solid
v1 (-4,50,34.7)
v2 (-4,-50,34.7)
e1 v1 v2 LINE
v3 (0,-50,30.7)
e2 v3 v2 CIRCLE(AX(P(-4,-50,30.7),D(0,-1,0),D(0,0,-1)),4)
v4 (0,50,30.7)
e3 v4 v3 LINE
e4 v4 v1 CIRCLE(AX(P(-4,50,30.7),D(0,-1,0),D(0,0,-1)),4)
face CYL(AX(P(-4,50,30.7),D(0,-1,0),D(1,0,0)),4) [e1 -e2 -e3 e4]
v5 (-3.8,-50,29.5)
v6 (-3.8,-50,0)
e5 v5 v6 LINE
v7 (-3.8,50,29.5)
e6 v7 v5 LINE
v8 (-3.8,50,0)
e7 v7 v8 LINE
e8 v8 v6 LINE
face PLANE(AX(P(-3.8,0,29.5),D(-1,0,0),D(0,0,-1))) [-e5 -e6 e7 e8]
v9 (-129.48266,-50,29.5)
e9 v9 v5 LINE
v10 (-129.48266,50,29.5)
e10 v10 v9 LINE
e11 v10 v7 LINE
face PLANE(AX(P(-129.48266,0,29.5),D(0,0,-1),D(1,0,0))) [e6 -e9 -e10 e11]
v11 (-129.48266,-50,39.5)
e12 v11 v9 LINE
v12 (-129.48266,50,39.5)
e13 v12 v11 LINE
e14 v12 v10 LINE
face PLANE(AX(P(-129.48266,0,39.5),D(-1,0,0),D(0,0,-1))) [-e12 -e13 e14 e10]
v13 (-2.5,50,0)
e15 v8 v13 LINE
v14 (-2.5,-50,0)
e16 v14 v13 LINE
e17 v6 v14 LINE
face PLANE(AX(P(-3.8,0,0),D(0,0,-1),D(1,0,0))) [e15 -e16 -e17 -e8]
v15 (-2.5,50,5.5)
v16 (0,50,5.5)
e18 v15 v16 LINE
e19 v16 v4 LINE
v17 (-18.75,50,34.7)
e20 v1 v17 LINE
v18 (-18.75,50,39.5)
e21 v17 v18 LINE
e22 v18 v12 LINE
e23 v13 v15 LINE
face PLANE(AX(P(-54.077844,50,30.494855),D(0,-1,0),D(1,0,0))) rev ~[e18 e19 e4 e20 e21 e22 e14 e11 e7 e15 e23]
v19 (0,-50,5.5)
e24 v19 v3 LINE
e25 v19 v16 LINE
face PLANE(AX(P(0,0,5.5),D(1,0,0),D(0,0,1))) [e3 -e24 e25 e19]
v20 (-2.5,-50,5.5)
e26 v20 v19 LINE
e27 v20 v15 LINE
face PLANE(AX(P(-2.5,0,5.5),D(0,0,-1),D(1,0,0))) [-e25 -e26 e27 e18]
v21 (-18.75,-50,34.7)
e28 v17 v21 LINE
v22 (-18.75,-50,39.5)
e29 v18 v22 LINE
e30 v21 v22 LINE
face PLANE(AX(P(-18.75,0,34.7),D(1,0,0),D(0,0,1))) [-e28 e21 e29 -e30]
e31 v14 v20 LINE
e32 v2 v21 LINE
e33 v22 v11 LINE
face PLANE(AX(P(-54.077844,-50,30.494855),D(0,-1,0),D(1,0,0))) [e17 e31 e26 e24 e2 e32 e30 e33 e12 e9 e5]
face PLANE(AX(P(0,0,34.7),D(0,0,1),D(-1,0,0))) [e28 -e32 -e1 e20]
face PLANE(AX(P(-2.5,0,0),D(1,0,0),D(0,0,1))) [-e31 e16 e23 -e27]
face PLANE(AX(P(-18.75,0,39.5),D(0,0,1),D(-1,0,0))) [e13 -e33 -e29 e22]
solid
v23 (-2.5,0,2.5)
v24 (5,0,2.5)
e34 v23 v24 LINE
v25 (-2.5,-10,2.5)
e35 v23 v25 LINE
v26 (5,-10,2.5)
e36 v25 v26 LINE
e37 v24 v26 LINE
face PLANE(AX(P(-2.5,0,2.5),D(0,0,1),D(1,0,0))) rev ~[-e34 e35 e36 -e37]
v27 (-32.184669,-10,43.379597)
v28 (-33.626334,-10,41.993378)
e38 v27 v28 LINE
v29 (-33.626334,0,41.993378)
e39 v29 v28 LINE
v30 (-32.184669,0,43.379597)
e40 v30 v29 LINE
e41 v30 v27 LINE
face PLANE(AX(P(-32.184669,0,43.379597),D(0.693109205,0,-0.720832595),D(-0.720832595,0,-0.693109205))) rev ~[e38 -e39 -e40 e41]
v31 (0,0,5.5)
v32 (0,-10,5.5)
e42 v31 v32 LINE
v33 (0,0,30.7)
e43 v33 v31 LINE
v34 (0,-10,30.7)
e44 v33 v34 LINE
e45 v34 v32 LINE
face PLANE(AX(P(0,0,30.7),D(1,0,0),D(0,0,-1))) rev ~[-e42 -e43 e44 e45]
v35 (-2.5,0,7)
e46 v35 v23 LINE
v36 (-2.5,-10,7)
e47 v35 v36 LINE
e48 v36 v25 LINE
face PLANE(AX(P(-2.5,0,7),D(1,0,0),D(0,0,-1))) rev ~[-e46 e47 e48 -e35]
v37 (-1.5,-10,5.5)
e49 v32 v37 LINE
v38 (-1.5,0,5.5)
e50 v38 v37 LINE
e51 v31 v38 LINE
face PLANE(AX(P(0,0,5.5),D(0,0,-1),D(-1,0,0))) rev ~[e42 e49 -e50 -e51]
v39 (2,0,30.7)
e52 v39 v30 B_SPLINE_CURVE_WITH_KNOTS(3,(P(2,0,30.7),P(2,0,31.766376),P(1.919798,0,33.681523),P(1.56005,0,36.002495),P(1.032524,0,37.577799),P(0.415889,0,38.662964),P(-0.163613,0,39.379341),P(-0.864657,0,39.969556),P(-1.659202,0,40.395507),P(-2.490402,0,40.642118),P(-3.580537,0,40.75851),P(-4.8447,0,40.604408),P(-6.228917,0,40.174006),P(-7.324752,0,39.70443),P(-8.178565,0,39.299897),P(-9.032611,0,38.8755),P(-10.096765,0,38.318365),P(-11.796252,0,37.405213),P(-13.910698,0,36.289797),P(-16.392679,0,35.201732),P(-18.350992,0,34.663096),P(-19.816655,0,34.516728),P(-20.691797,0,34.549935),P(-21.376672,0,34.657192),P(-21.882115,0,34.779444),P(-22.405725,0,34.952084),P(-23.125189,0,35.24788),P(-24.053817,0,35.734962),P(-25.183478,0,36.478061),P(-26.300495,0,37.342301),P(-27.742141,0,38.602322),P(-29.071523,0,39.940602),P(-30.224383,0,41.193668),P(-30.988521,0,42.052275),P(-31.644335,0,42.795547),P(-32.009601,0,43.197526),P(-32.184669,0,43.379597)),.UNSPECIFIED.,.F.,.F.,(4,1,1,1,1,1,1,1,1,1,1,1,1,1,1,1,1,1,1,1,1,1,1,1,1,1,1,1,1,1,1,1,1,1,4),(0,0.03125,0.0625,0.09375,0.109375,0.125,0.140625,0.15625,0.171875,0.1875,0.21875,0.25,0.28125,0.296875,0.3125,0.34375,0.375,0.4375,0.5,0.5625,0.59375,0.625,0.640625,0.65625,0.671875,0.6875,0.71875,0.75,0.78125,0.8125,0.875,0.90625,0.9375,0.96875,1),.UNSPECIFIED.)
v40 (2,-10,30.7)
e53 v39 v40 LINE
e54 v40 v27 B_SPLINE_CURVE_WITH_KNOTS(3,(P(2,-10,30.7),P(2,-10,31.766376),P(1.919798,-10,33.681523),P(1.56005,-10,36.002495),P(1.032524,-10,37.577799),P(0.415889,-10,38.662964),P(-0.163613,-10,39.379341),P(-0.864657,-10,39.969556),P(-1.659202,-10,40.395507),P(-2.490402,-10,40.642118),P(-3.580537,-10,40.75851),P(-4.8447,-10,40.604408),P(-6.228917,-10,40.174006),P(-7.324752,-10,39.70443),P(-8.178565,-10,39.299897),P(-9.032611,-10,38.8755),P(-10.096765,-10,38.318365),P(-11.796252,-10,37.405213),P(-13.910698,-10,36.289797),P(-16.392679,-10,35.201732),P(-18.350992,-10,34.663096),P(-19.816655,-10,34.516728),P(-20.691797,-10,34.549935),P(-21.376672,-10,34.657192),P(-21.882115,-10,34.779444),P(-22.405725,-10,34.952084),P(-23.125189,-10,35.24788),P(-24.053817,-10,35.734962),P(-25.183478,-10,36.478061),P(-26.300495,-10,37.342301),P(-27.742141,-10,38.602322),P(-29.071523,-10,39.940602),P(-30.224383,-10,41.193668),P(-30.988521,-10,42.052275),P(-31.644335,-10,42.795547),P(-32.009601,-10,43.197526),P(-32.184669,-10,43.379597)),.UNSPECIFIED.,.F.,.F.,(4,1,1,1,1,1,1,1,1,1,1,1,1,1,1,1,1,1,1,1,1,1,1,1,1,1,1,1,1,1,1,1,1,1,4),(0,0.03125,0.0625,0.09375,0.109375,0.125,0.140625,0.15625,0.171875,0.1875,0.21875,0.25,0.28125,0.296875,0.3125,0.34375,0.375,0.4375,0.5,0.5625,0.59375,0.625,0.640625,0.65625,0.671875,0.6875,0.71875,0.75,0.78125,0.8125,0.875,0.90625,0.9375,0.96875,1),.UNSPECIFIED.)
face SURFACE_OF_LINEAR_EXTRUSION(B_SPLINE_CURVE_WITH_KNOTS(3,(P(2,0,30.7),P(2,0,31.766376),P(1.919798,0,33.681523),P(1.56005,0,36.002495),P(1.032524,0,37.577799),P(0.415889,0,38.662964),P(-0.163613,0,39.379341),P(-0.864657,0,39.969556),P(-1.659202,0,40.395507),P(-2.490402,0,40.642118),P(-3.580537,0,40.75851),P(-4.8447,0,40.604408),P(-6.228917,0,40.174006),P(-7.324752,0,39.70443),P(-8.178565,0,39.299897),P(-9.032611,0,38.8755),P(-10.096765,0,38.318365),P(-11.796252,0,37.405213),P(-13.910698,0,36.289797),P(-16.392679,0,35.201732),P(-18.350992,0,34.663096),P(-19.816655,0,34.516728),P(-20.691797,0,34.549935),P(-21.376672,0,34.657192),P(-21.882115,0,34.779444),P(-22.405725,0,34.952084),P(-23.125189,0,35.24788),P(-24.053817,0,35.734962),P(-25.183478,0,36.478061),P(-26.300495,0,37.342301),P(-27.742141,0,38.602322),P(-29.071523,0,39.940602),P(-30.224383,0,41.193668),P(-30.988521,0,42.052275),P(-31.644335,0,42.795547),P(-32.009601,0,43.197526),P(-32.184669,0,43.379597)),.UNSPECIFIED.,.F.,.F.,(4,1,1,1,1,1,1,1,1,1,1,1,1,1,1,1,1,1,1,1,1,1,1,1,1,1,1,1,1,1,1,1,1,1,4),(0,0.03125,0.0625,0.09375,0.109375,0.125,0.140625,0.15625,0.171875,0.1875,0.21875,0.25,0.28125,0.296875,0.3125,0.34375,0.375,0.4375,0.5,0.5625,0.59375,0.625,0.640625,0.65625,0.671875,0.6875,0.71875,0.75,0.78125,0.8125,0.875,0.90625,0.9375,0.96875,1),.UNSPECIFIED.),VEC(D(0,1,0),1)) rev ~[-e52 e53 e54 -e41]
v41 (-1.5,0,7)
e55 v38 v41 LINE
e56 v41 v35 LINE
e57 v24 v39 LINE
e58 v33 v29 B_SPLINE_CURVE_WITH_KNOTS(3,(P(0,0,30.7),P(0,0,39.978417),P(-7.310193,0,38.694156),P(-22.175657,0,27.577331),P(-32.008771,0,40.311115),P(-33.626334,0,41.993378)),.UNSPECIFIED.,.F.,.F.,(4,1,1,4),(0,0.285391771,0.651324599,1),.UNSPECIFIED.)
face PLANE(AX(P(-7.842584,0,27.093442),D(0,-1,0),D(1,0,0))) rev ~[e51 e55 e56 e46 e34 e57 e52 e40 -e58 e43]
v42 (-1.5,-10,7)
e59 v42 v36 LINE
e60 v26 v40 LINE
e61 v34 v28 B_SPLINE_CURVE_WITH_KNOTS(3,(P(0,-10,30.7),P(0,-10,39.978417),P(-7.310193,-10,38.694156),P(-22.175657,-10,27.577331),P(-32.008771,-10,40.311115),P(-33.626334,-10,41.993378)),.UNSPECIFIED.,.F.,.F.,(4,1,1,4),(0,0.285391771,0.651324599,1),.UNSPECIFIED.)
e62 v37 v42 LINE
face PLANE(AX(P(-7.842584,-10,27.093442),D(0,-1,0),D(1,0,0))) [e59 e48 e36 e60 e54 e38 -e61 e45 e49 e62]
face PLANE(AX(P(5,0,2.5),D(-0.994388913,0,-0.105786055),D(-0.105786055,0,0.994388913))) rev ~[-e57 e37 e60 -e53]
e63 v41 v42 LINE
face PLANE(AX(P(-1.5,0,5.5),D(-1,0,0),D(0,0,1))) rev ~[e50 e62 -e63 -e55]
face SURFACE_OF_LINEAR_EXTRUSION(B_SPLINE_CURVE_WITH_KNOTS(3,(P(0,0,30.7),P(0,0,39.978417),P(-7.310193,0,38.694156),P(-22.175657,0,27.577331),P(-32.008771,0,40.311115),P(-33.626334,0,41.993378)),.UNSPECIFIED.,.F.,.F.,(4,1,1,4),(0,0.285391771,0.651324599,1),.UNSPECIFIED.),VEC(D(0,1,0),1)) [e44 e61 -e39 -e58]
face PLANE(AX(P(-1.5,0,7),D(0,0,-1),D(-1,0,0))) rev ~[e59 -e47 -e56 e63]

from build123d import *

# Parameters (mm, degrees)
F1_DEPTH = 50
F2_R     = 4
F4_DEPTH = 10


# Not quite as in the source:
# - the dataset's text gives a spline's control points without its knots; the knots are read off the source's solid


with BuildPart() as f1:
    # F0 (on Front) → F1 (new body, symmetric)
    with BuildSketch(Plane.XZ):
        Polygon((0, 5.5), (0, 34.7), (-18.75, 34.7), (-18.75, 39.5), (-129.4826599298, 39.5), (-129.4826599298, 29.5), (-3.8, 29.5), (-3.8, 0), (-2.5, 0), (-2.5, 5.5), align=None)
    extrude(amount=F1_DEPTH, both=True)

    # F2
    f2_edges = [f1.edges().sort_by_distance(p)[0] for p in [
        (0, 0, 34.7),
    ]]
    fillet(f2_edges, radius=F2_R)


with BuildPart() as f4:
    # F3 (on Front) → F4 (new body)
    with BuildSketch(Plane.XZ):
        with BuildLine():
            Line((0, 30.7), (0, 5.5))
            Line((0, 5.5), (-1.5, 5.5))
            Line((-1.5, 5.5), (-1.5, 7))
            Line((-1.5, 7), (-2.5, 7))
            Line((-2.5, 7), (-2.5, 5.5))
            Line((-2.5, 5.5), (-2.5, 2.5))
            Line((-2.5, 2.5), (5, 2.5))
            Line((5, 2.5), (2, 30.7))
            add(Edge.make_bspline(
                [(2, 30.7), (2, 31.7663755094), (1.9197978856, 33.6815229202), (1.560050438, 36.0024950572), (1.0325239491, 37.5777989644), (0.4158888599, 38.6629640394), (-0.1636126536, 39.3793411079), (-0.8646567386, 39.9695560734), (-1.6592021315, 40.3955071637), (-2.4904020482, 40.6421178896), (-3.5805366392, 40.7585096187), (-4.8446996517, 40.6044084525), (-6.228916873, 40.1740055139), (-7.3247518132, 39.7044300401), (-8.1785645119, 39.2998972581), (-9.0326113969, 38.8755002829), (-10.096764527, 38.3183652887), (-11.7962518236, 37.4052131626), (-13.9106977139, 36.2897970194), (-16.3926786988, 35.2017320437), (-18.3509918097, 34.6630955174), (-19.8166550492, 34.5167284053), (-20.6917970101, 34.5499347509), (-21.3766716144, 34.6571924904), (-21.8821148851, 34.7794442799), (-22.4057251629, 34.9520837377), (-23.1251886297, 35.2478795474), (-24.0538174781, 35.7349619931), (-25.1834777576, 36.4780606848), (-26.3004948953, 37.3423008268), (-27.7421408169, 38.6023216567), (-29.0715230137, 39.9406021799), (-30.2243827664, 41.1936677419), (-30.9885209637, 42.052275421), (-31.6443353319, 42.7955467899), (-32.0096009958, 43.1975262649), (-32.1846689975, 43.3795967395)],
                knots=[0, 0, 0, 0, 0.03125, 0.0625, 0.09375, 0.109375, 0.125, 0.140625, 0.15625, 0.171875, 0.1875, 0.21875, 0.25, 0.28125, 0.296875, 0.3125, 0.34375, 0.375, 0.4375, 0.5, 0.5625, 0.59375, 0.625, 0.640625, 0.65625, 0.671875, 0.6875, 0.71875, 0.75, 0.78125, 0.8125, 0.875, 0.90625, 0.9375, 0.96875, 1, 1, 1, 1], degree=3))
            Line((-32.1846689975, 43.3795967395), (-33.6263341869, 41.993378329))
            add(Edge.make_bspline(
                [(0, 30.7), (0, 39.9784169766), (-7.3101929171, 38.6941557742), (-22.175657359, 27.5773311116), (-32.0087713963, 40.311115311), (-33.6263341869, 41.993378329)],
                knots=[0, 0, 0, 0, 0.2853917714, 0.6513245985, 1, 1, 1, 1], degree=3))
        make_face()
    extrude(amount=F4_DEPTH)


solid = Compound([f1.part, f4.part])
